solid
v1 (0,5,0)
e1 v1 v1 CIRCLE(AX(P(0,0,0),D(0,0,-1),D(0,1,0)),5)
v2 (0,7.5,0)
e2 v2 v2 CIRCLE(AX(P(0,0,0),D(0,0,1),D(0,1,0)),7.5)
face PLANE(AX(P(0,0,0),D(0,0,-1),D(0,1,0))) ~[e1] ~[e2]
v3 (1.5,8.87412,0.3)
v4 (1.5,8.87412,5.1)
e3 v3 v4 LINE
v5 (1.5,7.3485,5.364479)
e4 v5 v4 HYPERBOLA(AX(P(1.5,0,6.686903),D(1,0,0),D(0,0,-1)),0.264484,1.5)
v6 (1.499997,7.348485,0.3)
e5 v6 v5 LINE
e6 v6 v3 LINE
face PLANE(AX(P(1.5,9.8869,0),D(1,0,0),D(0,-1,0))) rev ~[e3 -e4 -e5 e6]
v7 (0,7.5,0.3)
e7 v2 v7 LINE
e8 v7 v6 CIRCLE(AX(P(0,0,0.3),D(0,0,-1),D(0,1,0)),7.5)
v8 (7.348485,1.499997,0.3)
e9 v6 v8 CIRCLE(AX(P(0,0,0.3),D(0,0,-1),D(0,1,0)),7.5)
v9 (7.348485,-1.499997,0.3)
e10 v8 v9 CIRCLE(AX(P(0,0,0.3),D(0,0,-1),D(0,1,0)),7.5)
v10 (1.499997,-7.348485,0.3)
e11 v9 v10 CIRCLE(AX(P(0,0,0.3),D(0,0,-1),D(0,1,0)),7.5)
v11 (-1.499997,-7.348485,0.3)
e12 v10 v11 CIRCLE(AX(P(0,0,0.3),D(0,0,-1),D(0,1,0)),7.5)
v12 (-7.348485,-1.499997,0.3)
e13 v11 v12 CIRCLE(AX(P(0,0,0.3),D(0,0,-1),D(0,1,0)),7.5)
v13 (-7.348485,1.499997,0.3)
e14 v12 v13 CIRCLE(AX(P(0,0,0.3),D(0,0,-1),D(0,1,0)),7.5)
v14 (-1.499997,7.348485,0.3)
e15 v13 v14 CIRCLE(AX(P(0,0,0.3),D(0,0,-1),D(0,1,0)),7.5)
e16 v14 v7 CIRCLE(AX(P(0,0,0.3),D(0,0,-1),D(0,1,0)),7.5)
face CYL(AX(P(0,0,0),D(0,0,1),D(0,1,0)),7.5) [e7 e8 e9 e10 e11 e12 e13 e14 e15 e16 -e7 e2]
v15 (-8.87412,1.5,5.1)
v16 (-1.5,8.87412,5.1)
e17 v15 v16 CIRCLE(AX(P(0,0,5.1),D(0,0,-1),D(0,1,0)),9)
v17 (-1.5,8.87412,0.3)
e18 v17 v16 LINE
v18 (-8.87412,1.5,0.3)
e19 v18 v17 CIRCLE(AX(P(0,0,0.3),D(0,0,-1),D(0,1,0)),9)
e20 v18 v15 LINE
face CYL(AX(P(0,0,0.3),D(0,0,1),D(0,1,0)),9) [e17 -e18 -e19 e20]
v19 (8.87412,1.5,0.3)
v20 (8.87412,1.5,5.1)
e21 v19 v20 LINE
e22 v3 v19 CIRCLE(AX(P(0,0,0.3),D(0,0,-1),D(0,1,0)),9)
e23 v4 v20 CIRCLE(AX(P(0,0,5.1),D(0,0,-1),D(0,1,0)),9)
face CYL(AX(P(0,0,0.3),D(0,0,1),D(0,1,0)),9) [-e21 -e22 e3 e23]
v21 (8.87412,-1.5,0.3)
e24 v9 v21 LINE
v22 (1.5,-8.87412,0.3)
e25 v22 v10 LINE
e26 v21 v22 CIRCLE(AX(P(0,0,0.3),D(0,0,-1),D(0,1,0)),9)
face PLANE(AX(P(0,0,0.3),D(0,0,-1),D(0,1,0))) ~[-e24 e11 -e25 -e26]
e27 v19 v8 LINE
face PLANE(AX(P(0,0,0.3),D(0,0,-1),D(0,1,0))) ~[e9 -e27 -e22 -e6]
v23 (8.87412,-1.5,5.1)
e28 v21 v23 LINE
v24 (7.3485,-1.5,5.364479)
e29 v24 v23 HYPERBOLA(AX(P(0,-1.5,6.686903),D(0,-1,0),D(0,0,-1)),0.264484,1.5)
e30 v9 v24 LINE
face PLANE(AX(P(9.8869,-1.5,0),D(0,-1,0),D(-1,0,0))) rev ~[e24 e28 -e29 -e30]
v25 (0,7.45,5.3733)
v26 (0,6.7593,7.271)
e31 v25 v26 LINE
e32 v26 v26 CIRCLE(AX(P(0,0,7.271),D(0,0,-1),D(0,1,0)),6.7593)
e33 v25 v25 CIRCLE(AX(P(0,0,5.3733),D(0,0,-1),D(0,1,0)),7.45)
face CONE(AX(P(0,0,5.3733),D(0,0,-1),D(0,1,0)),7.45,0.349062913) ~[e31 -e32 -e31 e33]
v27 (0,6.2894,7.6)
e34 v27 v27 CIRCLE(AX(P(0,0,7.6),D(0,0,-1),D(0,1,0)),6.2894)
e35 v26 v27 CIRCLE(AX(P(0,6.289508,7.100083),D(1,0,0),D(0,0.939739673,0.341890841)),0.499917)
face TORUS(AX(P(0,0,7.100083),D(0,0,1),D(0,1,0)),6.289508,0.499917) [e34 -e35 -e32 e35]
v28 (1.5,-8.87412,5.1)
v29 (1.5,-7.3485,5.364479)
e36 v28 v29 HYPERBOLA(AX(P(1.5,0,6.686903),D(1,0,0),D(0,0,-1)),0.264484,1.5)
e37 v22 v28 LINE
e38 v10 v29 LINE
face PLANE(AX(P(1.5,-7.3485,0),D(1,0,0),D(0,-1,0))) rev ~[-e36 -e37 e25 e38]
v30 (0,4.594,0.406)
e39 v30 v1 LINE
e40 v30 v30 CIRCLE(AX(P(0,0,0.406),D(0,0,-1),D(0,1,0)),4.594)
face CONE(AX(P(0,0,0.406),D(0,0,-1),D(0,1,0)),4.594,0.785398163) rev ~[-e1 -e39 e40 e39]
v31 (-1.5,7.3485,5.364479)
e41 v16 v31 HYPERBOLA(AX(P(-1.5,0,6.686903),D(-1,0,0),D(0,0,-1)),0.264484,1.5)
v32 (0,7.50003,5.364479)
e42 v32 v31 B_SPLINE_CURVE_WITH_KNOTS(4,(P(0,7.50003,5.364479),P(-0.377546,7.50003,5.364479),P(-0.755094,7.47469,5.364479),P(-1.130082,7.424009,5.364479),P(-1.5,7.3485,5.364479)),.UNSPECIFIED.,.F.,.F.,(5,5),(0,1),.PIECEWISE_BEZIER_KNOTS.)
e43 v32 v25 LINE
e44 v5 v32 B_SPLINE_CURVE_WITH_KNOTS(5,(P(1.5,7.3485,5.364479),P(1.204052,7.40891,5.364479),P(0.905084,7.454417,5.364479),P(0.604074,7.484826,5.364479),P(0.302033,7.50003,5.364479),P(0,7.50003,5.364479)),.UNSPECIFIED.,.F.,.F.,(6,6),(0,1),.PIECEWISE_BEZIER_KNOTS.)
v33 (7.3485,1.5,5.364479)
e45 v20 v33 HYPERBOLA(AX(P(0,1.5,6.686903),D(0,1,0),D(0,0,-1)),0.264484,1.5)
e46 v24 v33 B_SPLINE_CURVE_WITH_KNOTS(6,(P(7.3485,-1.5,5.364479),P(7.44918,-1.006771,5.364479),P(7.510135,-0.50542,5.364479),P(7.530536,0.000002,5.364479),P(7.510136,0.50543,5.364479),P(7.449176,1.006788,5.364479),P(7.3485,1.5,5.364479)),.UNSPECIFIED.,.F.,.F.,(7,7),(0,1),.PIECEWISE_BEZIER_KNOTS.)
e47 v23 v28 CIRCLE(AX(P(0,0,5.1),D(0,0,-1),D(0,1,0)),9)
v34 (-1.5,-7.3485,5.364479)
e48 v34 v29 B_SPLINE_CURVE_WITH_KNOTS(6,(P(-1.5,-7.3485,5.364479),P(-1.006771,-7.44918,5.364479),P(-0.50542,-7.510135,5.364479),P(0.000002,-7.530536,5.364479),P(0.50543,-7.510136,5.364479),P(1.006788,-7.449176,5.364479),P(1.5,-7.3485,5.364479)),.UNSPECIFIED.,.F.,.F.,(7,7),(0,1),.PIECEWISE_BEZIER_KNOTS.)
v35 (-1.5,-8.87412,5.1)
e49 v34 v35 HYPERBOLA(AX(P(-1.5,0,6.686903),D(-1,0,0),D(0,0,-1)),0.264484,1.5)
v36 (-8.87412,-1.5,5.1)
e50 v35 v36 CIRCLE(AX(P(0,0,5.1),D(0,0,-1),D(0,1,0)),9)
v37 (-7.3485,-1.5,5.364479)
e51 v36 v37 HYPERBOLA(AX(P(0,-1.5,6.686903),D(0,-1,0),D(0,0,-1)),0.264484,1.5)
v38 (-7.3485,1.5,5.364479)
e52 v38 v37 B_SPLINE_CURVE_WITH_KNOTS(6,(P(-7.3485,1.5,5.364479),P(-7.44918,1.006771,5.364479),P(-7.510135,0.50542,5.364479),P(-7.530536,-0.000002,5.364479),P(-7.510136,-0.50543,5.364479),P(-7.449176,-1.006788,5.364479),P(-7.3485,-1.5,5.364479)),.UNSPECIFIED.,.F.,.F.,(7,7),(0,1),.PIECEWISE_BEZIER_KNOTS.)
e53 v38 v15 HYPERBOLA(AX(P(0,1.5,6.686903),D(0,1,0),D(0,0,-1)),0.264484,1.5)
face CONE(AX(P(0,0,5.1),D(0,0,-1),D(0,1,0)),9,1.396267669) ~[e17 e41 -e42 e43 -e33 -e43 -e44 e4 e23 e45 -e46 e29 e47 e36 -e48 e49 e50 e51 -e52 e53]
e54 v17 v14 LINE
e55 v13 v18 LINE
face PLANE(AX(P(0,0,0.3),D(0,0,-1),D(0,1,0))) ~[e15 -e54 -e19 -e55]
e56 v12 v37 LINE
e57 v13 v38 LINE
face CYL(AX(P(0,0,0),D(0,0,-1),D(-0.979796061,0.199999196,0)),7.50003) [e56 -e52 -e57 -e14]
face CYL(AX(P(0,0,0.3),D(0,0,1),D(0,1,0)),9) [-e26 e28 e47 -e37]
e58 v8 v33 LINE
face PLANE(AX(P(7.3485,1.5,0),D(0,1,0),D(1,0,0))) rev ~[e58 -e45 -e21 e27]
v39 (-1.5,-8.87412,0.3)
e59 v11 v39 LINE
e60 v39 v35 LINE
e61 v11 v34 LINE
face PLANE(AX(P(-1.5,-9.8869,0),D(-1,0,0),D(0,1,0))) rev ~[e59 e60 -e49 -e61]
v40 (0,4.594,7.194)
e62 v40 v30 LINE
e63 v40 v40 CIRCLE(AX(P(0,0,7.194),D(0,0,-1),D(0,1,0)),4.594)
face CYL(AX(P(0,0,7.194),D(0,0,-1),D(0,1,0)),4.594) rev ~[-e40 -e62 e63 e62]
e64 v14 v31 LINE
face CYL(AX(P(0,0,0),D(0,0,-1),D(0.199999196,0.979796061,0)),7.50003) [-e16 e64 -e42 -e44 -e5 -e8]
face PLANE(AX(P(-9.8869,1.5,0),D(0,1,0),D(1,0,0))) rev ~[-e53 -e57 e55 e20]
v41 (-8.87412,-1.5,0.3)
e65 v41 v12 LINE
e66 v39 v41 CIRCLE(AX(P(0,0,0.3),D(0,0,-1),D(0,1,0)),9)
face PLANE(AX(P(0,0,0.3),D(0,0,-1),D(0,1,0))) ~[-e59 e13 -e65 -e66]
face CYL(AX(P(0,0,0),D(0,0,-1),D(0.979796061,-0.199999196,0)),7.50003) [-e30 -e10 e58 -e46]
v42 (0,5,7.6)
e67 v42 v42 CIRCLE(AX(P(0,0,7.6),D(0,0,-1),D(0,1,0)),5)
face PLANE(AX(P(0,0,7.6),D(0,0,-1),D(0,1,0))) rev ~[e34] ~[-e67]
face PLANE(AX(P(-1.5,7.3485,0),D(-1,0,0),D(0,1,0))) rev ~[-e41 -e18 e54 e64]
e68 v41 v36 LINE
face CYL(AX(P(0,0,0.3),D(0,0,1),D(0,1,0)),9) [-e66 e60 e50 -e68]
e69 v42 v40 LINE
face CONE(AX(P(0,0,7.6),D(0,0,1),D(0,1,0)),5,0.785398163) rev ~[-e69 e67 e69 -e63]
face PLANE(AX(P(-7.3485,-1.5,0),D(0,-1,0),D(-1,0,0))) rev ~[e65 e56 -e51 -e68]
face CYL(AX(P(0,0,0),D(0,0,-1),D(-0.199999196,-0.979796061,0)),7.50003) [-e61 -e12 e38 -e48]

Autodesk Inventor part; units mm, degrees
sketch "Skizze_1" plane through (0, 0, 0) normal (1, 0, 0) x (0, 1, 0)
  line L0 (0, 0) -> (0, 7.6)
  line L1 (6.2894, 7.6) -> (5, 7.6)
  line L2 (5, 7.6) -> (4.594, 7.194)
  line L3 (4.594, 7.194) -> (4.594, 0.406)
  line L4 (4.594, 0.406) -> (5, 0)
  line L5 (5, 0) -> (7.5, 0)
  line L6 (7.5, 0) -> (7.5, 0.3)
  line L7 (7.5, 0.3) -> (9, 0.3)
  line L8 (9, 0.3) -> (9, 5.1)
  line L9 (9, 5.1) -> (7.45, 5.3733)
  line L10 (7.45, 5.3733) -> (6.7593, 7.271)
  arc A0 (6.7593, 7.271) -> (6.2894, 7.6) centre (6.2894, 7.1) ccw
revolve "Revolution1" add sketch "Skizze_1" angle 360 about axis through (0, 0, 0) along (0, 0, -1)
thread "Thread1" size "M10x0.75" class "6H" standard "ISO Metric profile" full length
sketch "Skizze_2" plane through (0, 0, 0) normal (0, 0, 1) x (1, 0, 0)
  line L0 (-18, 18) -> (-18, -18)
  line L1 (-18, -18) -> (18, -18)
  line L2 (18, -18) -> (18, 18)
  line L3 (18, 18) -> (-18, 18)
  arc A0 (-9.8869, -1.5) -> (-1.5, -9.8869) centre (0, 0) ccw
  line L4 (-1.5, -9.8869) -> (-1.5, -7.3485)
  arc A1 (-1.5, -7.3485) -> (1.5, -7.3485) centre (0, 0) ccw
  line L5 (1.5, -7.3485) -> (1.5, -9.8869)
  arc A2 (1.5, -9.8869) -> (9.8869, -1.5) centre (0, 0) ccw
  line L6 (9.8869, -1.5) -> (7.3485, -1.5)
  arc A3 (7.3485, -1.5) -> (7.3485, 1.5) centre (0, 0) ccw
  line L7 (7.3485, 1.5) -> (9.8869, 1.5)
  arc A4 (9.8869, 1.5) -> (1.5, 9.8869) centre (0, 0) ccw
  line L8 (1.5, 9.8869) -> (1.5, 7.3485)
  arc A5 (1.5, 7.3485) -> (-1.5, 7.3485) centre (0, 0) ccw
  line L9 (-1.5, 7.3485) -> (-1.5, 9.8869)
  arc A6 (-1.5, 9.8869) -> (-9.8869, 1.5) centre (0, 0) ccw
  line L10 (-9.8869, 1.5) -> (-7.3485, 1.5)
  arc A7 (-7.3485, 1.5) -> (-7.3485, -1.5) centre (0, 0) ccw
  line L11 (-7.3485, -1.5) -> (-9.8869, -1.5)
extrude "Extrusion1" cut sketch "Skizze_2" along normal blind 7.6
ref_plane "ANBAU_XY" through (0, 0, 0) normal (0, 0, 1) x (1, 0, 0)
ref_plane "ANBAU_YZ" through (0, 0, 0) normal (1, 0, 0) x (0, 1, 0)
ref_plane "ANBAU_ZX" through (0, 0, 0) normal (0, 1, 0) x (0, 0, 1)
properties part number "717739 GUK M10x0.75"
